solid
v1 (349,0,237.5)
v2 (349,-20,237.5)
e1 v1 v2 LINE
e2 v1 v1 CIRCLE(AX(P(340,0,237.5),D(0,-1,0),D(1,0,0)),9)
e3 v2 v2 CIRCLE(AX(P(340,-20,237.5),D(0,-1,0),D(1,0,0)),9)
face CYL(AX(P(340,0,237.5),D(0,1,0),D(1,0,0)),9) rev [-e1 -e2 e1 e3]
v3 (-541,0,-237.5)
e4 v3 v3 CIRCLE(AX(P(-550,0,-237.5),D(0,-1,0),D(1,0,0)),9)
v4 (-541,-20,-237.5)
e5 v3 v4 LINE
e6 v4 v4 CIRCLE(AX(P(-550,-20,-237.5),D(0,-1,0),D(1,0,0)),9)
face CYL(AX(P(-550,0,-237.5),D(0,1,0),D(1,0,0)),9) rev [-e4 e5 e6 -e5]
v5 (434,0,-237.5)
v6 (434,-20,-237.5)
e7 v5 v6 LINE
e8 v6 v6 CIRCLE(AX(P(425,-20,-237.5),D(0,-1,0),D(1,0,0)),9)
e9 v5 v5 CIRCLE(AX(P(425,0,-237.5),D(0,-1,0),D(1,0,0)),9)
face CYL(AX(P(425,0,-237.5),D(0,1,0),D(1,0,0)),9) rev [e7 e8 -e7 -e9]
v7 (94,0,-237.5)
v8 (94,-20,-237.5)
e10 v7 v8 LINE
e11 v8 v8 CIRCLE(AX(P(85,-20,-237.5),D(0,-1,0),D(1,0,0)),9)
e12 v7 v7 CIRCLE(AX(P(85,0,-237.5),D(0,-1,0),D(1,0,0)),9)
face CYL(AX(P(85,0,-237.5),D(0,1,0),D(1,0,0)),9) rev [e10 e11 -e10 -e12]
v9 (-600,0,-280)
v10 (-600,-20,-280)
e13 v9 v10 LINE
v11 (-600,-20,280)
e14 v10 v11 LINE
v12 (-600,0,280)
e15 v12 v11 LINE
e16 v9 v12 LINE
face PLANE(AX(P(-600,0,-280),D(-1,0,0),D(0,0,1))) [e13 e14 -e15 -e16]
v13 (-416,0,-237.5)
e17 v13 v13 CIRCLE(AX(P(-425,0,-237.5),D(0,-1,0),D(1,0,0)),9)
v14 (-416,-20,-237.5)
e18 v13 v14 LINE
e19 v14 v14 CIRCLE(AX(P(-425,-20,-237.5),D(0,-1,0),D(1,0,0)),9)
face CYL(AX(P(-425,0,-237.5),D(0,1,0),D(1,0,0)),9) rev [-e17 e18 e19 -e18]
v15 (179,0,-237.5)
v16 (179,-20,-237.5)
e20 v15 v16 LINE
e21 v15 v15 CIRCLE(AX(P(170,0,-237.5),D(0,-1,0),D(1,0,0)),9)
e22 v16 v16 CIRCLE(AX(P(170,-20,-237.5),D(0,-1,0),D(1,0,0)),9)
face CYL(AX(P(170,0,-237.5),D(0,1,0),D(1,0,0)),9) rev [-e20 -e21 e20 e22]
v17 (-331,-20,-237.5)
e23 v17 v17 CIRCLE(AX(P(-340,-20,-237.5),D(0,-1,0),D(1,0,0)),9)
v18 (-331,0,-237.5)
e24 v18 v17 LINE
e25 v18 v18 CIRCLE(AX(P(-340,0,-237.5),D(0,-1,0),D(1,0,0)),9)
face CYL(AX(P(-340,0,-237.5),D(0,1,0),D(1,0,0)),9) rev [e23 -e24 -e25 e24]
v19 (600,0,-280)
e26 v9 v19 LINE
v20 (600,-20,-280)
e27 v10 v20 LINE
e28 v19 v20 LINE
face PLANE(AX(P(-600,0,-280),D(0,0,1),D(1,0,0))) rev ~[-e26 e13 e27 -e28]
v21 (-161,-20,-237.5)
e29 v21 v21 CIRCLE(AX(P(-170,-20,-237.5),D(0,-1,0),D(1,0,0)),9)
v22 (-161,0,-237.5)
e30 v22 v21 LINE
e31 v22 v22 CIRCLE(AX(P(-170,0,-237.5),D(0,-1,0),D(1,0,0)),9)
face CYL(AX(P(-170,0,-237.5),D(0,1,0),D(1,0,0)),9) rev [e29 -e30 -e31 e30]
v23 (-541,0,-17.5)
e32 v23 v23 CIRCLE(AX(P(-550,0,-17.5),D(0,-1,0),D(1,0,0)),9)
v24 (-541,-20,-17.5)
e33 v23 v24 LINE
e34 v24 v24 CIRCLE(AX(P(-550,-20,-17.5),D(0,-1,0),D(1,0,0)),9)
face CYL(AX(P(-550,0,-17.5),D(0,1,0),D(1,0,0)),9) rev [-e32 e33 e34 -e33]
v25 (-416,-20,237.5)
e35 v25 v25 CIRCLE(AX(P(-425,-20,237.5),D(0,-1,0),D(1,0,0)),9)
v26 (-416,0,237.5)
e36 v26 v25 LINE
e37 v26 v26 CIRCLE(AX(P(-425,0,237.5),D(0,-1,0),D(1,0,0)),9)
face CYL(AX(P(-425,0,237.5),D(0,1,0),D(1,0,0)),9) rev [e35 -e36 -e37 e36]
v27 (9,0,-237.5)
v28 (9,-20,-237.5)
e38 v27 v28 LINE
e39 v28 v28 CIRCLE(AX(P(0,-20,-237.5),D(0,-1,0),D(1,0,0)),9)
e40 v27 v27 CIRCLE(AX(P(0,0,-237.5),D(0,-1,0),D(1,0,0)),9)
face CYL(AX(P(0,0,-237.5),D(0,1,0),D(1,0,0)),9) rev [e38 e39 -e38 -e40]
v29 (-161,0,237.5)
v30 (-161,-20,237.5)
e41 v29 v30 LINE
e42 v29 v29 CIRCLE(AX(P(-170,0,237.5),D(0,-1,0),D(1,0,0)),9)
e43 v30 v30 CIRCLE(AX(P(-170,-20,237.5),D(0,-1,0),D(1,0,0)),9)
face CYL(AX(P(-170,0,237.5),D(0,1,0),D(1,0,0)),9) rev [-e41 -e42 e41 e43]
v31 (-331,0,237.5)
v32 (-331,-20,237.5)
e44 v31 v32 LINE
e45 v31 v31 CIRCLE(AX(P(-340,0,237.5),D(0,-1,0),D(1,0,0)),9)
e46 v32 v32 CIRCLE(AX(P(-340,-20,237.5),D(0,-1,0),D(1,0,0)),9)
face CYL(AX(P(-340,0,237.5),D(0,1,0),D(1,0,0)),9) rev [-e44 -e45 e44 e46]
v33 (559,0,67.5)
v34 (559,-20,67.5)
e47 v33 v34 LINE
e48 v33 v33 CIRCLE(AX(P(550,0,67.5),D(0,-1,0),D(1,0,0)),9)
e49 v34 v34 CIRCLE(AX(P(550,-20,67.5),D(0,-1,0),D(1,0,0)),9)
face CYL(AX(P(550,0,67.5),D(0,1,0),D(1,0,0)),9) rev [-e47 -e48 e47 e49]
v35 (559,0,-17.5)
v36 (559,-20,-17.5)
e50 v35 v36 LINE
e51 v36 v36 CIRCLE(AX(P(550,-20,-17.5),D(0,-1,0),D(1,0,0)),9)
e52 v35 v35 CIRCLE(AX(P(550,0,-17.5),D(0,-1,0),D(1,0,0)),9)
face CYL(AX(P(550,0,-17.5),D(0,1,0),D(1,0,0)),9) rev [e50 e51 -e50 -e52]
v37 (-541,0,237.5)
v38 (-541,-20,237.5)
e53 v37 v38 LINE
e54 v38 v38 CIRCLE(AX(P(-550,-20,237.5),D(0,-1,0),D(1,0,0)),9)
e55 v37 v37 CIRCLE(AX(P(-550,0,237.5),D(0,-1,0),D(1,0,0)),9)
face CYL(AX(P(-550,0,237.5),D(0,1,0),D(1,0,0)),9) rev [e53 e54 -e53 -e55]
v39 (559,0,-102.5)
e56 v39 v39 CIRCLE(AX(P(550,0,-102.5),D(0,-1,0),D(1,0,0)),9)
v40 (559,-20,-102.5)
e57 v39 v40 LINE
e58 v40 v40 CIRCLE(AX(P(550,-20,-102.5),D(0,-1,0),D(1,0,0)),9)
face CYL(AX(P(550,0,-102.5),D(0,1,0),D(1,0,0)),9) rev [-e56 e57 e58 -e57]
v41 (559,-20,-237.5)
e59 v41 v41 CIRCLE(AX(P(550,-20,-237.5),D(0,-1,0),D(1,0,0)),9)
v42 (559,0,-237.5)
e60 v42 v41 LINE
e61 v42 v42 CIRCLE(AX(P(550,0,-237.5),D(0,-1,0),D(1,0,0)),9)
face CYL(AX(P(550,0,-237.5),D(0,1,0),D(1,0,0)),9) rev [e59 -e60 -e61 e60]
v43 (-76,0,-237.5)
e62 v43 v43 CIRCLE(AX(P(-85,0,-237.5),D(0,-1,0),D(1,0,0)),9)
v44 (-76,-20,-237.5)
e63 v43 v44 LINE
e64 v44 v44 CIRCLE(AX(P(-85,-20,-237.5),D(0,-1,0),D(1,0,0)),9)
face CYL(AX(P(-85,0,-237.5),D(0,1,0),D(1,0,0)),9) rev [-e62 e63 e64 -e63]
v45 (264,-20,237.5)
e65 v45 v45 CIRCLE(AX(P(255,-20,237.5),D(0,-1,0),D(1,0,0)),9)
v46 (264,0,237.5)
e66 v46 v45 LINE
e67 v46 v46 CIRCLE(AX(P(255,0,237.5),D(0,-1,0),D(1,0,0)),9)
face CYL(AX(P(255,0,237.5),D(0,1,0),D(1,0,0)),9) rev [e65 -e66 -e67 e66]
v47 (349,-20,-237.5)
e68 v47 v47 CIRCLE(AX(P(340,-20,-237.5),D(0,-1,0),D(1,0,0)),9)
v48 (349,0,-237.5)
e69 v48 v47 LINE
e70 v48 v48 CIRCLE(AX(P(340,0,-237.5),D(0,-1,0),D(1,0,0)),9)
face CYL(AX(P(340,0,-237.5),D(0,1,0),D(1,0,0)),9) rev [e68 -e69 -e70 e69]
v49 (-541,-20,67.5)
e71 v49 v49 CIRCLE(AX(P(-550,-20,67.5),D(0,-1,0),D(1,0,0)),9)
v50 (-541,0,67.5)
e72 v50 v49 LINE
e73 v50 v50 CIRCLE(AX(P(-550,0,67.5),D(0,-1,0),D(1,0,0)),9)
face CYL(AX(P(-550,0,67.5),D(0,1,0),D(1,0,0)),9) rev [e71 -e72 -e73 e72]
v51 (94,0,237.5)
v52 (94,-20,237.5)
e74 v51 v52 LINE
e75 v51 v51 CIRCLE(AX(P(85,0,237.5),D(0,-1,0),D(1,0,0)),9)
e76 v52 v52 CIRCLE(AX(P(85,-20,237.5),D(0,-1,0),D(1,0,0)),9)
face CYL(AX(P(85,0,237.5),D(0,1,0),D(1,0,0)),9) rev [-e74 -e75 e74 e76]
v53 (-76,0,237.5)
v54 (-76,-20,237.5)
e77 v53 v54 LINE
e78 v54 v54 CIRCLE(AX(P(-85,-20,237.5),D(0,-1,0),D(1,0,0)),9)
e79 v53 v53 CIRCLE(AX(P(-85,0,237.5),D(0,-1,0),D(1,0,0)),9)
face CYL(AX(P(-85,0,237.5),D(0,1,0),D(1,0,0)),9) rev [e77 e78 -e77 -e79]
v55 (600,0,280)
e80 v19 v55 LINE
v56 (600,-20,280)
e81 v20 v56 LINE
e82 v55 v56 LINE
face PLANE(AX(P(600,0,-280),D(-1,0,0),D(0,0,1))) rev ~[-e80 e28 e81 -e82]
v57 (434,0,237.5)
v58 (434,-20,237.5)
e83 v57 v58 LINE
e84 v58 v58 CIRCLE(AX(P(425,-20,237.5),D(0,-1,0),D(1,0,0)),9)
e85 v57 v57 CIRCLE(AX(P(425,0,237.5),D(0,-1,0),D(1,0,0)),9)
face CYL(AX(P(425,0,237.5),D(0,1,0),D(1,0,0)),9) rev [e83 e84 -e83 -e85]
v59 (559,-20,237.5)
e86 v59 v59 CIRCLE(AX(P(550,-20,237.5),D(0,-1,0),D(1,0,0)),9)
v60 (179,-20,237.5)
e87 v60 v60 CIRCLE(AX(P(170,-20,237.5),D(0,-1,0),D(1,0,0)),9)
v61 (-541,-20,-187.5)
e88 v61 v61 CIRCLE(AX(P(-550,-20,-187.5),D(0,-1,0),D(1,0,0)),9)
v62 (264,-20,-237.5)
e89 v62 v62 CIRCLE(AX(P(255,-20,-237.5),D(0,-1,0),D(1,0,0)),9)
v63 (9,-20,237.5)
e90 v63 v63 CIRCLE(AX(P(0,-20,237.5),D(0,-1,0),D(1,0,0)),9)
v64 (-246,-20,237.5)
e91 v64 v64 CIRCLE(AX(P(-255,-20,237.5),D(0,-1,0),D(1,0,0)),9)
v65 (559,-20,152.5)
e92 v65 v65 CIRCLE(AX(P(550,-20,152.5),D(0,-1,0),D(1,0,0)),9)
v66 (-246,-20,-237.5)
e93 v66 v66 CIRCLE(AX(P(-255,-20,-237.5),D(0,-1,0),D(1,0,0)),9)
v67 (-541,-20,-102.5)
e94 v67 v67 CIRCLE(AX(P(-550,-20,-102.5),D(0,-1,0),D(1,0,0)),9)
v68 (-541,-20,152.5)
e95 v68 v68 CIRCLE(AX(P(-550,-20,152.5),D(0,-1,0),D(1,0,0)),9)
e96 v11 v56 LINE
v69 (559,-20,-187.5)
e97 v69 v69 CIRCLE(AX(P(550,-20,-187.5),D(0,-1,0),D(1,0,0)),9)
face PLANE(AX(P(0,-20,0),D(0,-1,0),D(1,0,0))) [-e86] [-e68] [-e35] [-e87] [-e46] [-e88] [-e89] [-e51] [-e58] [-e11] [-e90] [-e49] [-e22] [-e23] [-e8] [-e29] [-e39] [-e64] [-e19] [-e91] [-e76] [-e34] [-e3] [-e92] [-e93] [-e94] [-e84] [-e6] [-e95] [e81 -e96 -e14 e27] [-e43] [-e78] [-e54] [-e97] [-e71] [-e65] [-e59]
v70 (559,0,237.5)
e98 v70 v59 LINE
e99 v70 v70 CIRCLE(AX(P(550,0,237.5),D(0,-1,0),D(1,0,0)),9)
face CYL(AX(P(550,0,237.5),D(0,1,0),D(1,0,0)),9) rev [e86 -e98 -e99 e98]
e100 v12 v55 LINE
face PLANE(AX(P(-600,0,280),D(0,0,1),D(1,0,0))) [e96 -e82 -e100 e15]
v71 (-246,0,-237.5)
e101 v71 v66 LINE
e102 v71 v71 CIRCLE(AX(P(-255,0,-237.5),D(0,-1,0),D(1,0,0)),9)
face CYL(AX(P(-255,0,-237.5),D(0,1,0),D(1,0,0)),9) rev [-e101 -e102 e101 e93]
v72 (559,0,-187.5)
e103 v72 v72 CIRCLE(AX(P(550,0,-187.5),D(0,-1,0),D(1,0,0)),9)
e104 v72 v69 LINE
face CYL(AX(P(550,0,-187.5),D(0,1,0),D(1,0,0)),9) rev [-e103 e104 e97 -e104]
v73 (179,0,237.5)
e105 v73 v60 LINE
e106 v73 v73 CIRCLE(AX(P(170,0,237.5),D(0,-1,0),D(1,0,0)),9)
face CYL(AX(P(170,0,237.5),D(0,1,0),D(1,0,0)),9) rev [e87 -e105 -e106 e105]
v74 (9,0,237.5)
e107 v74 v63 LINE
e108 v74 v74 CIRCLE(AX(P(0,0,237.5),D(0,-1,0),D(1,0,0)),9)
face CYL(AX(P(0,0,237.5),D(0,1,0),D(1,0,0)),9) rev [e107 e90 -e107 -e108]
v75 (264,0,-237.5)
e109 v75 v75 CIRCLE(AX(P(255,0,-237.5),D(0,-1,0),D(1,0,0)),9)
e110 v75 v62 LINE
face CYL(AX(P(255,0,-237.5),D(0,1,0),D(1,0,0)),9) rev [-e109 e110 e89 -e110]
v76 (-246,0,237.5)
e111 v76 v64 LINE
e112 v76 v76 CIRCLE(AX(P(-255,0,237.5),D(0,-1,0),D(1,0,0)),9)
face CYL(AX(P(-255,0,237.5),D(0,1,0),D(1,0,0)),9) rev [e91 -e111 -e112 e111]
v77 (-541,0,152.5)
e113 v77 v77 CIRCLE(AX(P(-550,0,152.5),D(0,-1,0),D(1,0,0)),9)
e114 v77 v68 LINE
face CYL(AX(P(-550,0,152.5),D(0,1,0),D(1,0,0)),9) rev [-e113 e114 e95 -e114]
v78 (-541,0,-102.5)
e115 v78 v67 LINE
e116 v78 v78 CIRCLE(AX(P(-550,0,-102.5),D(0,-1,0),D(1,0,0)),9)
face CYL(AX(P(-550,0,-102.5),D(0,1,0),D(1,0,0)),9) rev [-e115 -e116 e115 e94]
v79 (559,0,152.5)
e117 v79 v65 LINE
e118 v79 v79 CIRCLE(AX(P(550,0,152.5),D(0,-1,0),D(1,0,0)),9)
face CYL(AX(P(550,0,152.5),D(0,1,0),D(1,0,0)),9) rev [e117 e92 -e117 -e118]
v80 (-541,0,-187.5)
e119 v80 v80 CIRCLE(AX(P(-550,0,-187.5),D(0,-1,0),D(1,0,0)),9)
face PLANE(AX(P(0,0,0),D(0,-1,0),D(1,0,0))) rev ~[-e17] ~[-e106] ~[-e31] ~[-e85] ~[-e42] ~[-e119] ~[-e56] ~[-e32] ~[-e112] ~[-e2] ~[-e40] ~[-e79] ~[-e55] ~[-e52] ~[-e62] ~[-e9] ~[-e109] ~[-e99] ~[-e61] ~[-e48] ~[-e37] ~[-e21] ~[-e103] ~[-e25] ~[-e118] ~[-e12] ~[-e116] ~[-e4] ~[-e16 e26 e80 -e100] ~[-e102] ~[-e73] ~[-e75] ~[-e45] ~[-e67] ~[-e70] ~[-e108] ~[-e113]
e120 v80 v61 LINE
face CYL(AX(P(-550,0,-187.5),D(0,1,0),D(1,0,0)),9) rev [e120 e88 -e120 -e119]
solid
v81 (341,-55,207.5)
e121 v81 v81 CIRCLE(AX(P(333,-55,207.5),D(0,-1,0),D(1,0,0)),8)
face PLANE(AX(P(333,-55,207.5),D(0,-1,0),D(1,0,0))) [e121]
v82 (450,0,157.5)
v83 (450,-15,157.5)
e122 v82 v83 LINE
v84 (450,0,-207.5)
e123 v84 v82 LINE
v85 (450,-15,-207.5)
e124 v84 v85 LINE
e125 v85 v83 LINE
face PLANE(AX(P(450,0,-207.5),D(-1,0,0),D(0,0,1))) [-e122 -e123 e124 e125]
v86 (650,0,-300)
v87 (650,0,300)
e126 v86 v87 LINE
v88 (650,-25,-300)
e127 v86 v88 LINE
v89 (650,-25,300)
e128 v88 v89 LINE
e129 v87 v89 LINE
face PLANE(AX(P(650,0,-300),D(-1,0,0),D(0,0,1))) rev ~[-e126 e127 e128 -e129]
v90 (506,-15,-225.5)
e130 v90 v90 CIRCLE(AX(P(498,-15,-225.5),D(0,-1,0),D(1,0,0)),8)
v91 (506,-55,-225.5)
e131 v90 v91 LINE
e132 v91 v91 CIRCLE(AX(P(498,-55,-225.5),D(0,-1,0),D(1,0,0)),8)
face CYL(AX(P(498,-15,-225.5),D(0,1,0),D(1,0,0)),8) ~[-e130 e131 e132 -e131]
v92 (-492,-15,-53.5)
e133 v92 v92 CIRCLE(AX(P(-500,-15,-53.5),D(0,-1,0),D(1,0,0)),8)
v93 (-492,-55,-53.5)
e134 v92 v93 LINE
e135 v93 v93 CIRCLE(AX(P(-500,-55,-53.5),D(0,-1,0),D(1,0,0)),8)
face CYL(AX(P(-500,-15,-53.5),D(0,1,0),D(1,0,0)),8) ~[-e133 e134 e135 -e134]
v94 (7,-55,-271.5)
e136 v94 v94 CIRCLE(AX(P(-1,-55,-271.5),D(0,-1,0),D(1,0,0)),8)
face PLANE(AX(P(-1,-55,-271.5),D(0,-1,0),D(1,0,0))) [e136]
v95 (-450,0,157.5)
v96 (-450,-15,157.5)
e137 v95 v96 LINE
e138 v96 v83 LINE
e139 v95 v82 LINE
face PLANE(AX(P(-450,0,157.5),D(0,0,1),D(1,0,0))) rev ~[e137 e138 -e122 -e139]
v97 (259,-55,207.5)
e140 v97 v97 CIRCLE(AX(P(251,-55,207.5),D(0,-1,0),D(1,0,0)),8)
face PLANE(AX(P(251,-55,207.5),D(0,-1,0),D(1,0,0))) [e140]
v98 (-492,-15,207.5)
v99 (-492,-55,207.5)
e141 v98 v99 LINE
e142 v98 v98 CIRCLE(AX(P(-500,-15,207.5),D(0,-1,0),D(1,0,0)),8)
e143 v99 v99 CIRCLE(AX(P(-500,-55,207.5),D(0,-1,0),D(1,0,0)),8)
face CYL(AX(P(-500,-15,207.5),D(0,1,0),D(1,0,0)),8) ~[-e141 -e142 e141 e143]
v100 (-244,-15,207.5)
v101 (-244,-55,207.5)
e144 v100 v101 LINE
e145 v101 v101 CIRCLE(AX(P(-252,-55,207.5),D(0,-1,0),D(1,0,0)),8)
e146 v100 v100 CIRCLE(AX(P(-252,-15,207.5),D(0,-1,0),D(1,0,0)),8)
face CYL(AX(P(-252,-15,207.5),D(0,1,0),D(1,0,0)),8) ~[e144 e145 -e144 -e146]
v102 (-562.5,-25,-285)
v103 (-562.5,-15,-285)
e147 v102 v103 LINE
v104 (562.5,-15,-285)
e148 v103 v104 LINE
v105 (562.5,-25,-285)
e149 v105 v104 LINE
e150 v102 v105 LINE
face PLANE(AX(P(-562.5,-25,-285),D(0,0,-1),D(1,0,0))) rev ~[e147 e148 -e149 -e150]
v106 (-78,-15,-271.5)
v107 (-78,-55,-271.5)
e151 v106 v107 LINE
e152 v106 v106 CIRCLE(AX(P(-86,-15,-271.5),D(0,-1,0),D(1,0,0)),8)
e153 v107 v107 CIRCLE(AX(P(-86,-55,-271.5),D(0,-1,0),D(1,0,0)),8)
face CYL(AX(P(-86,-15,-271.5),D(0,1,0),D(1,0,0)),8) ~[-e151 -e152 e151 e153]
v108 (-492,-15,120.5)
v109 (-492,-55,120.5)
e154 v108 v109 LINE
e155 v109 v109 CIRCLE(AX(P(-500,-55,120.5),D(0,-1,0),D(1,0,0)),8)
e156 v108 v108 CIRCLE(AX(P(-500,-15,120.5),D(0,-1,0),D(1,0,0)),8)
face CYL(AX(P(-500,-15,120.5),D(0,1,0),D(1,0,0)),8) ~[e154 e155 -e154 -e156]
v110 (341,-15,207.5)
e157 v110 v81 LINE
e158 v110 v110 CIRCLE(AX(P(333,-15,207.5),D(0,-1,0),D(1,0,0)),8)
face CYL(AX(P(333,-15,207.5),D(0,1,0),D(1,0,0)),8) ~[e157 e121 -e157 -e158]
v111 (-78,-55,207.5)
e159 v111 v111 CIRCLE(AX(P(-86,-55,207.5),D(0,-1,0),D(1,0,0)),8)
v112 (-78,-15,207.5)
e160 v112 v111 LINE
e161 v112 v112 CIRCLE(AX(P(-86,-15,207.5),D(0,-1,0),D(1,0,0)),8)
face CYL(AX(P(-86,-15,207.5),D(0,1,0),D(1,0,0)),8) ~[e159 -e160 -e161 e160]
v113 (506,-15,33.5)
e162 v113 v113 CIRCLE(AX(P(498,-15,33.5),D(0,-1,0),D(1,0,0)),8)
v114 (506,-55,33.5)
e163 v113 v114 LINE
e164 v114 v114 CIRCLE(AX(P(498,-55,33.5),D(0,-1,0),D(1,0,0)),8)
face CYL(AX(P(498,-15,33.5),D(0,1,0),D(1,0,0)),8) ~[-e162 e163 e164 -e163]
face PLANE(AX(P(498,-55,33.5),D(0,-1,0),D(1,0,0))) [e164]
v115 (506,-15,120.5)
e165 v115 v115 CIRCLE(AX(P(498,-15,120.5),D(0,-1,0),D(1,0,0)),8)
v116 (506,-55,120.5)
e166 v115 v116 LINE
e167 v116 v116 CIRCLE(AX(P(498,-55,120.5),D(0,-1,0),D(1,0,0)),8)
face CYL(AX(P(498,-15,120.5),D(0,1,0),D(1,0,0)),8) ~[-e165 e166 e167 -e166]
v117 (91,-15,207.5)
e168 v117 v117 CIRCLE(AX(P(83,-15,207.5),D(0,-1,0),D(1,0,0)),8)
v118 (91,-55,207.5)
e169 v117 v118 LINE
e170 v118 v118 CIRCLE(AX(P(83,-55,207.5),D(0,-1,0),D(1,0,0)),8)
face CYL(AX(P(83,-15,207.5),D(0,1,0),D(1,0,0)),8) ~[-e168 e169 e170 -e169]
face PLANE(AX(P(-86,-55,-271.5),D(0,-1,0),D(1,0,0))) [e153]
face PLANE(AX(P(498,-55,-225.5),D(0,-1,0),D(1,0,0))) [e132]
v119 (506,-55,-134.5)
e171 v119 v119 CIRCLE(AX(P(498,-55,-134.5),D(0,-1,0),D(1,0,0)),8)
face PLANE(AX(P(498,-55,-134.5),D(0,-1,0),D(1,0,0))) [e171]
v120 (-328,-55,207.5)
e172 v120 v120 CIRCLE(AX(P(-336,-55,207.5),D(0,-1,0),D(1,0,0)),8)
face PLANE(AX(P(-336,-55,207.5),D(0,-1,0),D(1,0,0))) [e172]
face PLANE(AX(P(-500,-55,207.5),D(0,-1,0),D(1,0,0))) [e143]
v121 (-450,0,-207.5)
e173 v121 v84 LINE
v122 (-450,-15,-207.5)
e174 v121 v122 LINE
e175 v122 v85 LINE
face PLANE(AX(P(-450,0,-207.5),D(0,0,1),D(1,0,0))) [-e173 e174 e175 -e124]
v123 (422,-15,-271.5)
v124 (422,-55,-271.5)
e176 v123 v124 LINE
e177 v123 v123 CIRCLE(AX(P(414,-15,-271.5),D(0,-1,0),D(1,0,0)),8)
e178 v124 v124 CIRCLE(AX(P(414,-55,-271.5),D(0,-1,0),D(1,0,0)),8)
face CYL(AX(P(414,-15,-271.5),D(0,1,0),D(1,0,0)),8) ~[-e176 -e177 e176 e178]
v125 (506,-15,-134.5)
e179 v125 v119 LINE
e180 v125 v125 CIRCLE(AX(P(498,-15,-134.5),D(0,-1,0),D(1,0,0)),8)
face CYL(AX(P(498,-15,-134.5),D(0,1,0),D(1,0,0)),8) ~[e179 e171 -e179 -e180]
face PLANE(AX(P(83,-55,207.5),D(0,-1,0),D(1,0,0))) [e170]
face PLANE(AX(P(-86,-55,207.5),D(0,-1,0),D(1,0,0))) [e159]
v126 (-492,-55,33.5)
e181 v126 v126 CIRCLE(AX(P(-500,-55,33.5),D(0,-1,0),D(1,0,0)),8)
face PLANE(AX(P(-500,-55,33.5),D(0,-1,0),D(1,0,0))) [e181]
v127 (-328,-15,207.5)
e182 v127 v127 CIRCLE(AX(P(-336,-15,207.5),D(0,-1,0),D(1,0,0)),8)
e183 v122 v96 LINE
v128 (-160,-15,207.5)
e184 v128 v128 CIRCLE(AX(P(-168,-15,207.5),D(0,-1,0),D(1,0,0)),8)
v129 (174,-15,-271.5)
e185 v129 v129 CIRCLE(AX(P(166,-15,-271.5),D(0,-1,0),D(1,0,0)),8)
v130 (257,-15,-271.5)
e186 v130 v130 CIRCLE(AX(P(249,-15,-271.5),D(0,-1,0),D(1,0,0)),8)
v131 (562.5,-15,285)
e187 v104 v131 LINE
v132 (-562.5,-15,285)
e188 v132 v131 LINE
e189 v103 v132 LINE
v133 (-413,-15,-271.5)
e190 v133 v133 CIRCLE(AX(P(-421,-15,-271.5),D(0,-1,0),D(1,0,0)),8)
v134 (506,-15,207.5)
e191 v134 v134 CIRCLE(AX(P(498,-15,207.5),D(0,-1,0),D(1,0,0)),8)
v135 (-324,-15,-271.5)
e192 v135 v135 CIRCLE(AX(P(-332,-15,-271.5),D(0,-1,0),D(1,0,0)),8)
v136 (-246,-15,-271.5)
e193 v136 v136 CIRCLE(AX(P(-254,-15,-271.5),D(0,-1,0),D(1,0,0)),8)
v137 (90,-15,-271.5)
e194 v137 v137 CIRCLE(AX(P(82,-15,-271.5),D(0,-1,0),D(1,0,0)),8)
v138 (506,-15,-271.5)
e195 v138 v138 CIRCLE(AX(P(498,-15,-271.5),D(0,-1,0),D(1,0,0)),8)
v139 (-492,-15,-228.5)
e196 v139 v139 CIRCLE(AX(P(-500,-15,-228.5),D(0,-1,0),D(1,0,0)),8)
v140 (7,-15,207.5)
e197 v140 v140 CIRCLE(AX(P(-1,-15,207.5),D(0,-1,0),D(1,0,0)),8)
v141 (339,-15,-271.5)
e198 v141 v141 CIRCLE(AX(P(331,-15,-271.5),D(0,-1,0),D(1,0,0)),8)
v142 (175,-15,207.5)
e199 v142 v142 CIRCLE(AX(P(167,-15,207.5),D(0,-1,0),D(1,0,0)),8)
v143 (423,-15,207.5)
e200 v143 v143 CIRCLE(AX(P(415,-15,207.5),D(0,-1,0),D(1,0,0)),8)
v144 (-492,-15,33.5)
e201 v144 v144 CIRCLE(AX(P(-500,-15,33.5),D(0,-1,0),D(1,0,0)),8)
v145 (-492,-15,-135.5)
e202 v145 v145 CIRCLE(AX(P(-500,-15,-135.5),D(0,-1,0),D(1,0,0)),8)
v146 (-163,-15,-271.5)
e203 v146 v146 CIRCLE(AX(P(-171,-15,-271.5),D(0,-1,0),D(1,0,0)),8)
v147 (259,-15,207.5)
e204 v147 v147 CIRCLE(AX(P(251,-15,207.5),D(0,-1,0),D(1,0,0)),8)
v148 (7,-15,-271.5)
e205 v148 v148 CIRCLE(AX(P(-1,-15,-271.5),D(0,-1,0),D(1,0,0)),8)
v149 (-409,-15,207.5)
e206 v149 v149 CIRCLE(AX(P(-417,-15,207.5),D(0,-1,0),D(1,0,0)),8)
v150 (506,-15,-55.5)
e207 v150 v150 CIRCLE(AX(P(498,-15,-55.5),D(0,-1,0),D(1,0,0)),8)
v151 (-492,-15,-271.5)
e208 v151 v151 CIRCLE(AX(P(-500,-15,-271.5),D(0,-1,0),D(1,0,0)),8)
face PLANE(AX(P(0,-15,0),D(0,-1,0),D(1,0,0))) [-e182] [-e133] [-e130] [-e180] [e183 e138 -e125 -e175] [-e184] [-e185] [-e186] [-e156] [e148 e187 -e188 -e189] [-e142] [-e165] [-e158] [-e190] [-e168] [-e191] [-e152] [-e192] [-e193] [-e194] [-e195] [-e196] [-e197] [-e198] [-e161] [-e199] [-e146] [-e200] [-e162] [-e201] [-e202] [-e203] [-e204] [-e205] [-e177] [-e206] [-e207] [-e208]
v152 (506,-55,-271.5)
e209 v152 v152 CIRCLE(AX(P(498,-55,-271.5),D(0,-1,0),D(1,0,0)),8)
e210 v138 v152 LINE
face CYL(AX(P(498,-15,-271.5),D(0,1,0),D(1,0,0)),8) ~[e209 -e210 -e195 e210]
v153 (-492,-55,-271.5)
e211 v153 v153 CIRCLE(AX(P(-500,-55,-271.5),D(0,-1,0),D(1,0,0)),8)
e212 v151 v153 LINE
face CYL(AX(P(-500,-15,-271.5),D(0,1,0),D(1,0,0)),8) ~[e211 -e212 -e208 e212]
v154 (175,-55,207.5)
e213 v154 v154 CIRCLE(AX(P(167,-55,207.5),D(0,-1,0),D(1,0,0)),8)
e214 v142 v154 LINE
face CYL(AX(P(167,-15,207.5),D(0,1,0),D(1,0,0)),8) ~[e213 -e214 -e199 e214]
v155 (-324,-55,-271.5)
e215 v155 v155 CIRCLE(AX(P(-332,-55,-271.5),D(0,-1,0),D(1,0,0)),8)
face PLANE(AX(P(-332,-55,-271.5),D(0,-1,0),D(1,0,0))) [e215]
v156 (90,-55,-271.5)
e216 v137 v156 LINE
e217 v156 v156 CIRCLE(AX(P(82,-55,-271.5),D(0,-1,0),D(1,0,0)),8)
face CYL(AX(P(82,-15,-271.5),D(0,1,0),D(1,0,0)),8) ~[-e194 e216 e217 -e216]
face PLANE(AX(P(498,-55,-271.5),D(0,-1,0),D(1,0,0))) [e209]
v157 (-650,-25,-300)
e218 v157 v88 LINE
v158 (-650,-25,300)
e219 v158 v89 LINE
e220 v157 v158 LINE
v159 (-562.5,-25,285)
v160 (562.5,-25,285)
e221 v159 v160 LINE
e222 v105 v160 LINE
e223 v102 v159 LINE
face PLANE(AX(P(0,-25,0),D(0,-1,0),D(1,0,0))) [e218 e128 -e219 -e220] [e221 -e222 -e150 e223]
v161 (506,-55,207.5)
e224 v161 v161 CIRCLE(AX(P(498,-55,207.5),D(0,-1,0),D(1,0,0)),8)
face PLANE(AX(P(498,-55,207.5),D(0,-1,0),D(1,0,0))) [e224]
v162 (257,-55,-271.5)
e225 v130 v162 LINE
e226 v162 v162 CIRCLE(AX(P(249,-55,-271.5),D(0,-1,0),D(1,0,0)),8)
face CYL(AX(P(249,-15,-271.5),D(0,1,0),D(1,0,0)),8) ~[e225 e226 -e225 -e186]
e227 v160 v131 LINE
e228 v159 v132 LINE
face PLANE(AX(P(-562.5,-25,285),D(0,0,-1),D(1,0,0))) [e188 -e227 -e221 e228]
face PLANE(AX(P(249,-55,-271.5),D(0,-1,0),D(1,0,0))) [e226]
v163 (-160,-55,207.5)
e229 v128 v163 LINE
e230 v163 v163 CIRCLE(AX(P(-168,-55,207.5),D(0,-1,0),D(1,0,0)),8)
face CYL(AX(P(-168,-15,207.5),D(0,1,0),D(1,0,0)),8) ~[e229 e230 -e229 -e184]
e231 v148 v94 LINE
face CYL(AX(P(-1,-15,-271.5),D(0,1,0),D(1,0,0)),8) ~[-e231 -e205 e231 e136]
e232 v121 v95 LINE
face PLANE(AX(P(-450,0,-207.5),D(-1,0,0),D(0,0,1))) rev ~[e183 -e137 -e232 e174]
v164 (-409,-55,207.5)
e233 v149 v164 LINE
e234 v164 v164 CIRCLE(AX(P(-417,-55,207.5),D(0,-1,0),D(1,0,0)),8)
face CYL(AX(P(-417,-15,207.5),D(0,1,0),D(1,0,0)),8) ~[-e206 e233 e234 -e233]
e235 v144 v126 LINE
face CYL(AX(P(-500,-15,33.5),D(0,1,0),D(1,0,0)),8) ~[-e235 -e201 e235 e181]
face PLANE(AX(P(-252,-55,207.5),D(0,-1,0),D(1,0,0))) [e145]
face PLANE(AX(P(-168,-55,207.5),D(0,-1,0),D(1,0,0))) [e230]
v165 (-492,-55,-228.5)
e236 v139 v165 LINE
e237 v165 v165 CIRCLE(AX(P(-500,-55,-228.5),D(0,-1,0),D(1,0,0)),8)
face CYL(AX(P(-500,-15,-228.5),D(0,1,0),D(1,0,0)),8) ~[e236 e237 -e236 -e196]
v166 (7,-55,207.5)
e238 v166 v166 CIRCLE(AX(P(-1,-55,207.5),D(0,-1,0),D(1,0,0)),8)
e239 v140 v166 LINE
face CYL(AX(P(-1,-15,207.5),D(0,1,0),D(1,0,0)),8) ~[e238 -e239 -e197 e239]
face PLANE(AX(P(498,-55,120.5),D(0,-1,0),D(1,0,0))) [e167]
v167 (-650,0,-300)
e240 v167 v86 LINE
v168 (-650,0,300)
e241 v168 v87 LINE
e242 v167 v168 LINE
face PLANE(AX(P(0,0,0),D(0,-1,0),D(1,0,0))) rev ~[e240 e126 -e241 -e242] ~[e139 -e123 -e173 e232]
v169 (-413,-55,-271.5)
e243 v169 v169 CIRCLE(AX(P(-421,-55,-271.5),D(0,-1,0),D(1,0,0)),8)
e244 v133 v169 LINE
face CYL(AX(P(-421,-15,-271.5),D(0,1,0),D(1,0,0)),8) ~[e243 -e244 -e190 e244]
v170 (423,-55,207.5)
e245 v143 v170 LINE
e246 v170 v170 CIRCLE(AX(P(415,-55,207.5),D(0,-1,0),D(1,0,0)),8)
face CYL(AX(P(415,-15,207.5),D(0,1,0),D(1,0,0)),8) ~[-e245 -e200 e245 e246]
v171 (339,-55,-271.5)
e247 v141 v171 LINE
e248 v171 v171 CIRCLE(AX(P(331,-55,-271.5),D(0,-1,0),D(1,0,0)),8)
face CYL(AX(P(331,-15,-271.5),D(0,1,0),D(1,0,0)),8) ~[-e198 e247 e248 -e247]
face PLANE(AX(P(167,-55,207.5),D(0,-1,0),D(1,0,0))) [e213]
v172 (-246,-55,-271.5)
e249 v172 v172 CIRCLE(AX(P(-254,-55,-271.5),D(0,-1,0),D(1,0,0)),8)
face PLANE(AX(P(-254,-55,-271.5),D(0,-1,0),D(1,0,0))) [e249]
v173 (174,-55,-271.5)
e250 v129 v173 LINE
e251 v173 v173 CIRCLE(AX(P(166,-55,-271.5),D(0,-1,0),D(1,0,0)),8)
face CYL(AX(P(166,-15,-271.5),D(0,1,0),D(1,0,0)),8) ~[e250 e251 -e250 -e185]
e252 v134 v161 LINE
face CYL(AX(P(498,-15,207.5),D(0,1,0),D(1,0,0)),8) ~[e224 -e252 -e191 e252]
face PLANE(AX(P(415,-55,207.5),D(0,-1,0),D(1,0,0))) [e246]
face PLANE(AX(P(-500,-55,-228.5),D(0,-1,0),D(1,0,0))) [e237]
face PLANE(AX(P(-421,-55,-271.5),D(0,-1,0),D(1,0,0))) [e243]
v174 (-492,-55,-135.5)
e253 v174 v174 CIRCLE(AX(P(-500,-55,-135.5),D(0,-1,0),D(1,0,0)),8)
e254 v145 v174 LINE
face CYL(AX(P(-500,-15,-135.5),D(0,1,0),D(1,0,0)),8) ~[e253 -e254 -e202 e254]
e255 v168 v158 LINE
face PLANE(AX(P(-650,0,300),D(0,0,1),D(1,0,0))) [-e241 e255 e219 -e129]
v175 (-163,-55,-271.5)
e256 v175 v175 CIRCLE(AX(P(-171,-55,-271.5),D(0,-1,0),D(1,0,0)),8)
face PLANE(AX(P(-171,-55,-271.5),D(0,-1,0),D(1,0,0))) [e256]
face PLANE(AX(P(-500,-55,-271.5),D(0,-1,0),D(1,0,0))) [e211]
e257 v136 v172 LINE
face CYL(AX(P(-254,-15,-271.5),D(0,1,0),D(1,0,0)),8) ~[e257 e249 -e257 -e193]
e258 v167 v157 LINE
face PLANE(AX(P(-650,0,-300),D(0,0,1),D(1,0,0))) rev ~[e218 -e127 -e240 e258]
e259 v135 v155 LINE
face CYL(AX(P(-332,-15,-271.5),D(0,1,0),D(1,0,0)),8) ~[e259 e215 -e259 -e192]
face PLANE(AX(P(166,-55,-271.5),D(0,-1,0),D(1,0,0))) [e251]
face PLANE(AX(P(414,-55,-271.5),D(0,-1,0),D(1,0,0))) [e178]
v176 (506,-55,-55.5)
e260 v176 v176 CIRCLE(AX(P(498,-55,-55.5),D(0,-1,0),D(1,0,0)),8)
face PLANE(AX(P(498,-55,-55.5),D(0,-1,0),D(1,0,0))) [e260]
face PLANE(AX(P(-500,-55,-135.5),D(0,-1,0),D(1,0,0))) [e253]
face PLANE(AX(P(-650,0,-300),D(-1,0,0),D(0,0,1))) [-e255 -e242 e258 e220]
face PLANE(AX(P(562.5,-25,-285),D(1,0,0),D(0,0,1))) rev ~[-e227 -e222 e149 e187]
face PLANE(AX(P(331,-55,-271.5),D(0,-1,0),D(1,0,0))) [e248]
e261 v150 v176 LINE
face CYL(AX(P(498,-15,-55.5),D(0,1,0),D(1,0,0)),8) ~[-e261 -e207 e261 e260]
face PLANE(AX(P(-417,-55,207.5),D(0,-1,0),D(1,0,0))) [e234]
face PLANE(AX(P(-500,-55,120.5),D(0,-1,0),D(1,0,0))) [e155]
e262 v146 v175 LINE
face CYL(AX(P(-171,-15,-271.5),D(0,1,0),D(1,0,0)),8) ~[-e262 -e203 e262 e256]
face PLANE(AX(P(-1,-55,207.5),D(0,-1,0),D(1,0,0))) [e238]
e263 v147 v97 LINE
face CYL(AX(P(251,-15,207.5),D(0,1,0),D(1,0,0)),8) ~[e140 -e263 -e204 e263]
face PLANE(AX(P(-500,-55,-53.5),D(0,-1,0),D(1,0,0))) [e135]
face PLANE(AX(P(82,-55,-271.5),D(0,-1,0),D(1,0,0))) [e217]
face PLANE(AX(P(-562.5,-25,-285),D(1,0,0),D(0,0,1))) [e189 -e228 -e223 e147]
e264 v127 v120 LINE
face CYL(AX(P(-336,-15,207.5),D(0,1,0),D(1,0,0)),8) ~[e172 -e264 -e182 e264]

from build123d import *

# Parameters (mm, degrees)
F0_W     = 1200
F0_H     = 560
F0_R     = 9
F1_DEPTH = 20
F2_W     = 1300
F2_H     = 600
F2_W_2   = 900
F2_H_2   = 365
F3_DEPTH = 25
F4_W     = 1125
F4_H     = 570
F4_W_2   = 900
F4_H_2   = 365
F5_DEPTH = 10
F6_R     = 8
F7_DEPTH = 40


with BuildPart() as f1:
    # F0 (on Front) → F1 (new body)
    with BuildSketch(Plane.XZ):
        Rectangle(F0_W, F0_H)
        with Locations((-550, -237.5)):
            Circle(F0_R, mode=Mode.SUBTRACT)
        with Locations((-425, -237.5)):
            Circle(F0_R, mode=Mode.SUBTRACT)
        with Locations((-340, -237.5)):
            Circle(F0_R, mode=Mode.SUBTRACT)
        with Locations((-550, -187.5)):
            Circle(F0_R, mode=Mode.SUBTRACT)
        with Locations((-255, -237.5)):
            Circle(F0_R, mode=Mode.SUBTRACT)
        with Locations((-170, -237.5)):
            Circle(F0_R, mode=Mode.SUBTRACT)
        with Locations((-85, -237.5)):
            Circle(F0_R, mode=Mode.SUBTRACT)
        with Locations((-550, -102.5)):
            Circle(F0_R, mode=Mode.SUBTRACT)
        with Locations((-550, -17.5)):
            Circle(F0_R, mode=Mode.SUBTRACT)
        with Locations((0, -237.5)):
            Circle(F0_R, mode=Mode.SUBTRACT)
        with Locations((85, -237.5)):
            Circle(F0_R, mode=Mode.SUBTRACT)
        with Locations((170, -237.5)):
            Circle(F0_R, mode=Mode.SUBTRACT)
        with Locations((255, -237.5)):
            Circle(F0_R, mode=Mode.SUBTRACT)
        with Locations((340, -237.5)):
            Circle(F0_R, mode=Mode.SUBTRACT)
        with Locations((425, -237.5)):
            Circle(F0_R, mode=Mode.SUBTRACT)
        with Locations((550, -237.5)):
            Circle(F0_R, mode=Mode.SUBTRACT)
        with Locations((550, -187.5)):
            Circle(F0_R, mode=Mode.SUBTRACT)
        with Locations((550, -102.5)):
            Circle(F0_R, mode=Mode.SUBTRACT)
        with Locations((550, -17.5)):
            Circle(F0_R, mode=Mode.SUBTRACT)
        with Locations((-550, 67.5)):
            Circle(F0_R, mode=Mode.SUBTRACT)
        with Locations((-550, 152.5)):
            Circle(F0_R, mode=Mode.SUBTRACT)
        with Locations((-550, 237.5)):
            Circle(F0_R, mode=Mode.SUBTRACT)
        with Locations((-425, 237.5)):
            Circle(F0_R, mode=Mode.SUBTRACT)
        with Locations((-340, 237.5)):
            Circle(F0_R, mode=Mode.SUBTRACT)
        with Locations((-255, 237.5)):
            Circle(F0_R, mode=Mode.SUBTRACT)
        with Locations((-170, 237.5)):
            Circle(F0_R, mode=Mode.SUBTRACT)
        with Locations((-85, 237.5)):
            Circle(F0_R, mode=Mode.SUBTRACT)
        with Locations((550, 67.5)):
            Circle(F0_R, mode=Mode.SUBTRACT)
        with Locations((0, 237.5)):
            Circle(F0_R, mode=Mode.SUBTRACT)
        with Locations((85, 237.5)):
            Circle(F0_R, mode=Mode.SUBTRACT)
        with Locations((170, 237.5)):
            Circle(F0_R, mode=Mode.SUBTRACT)
        with Locations((255, 237.5)):
            Circle(F0_R, mode=Mode.SUBTRACT)
        with Locations((550, 152.5)):
            Circle(F0_R, mode=Mode.SUBTRACT)
        with Locations((340, 237.5)):
            Circle(F0_R, mode=Mode.SUBTRACT)
        with Locations((425, 237.5)):
            Circle(F0_R, mode=Mode.SUBTRACT)
        with Locations((550, 237.5)):
            Circle(F0_R, mode=Mode.SUBTRACT)
    extrude(amount=F1_DEPTH)


with BuildPart() as f3:
    # F2 (on Front) → F3 (new body)
    with BuildSketch(Plane.XZ):
        Rectangle(F2_W, F2_H)
        with Locations((0, -25)):
            Rectangle(F2_W_2, F2_H_2, mode=Mode.SUBTRACT)
    extrude(amount=F3_DEPTH)

    # F4 (on face) → F5 (cut)
    with BuildSketch(Plane.XZ.offset(25)):
        Rectangle(F4_W, F4_H)
        with Locations((0, -25)):
            Rectangle(F4_W_2, F4_H_2, mode=Mode.SUBTRACT)
    extrude(amount=-F5_DEPTH, mode=Mode.SUBTRACT)

    # F6 (on face) → F7 (join)
    with BuildSketch(Plane.XZ.offset(15)):
        with Locations((-500, 207.5)):
            Circle(F6_R)
        with Locations((-500, 120.5)):
            Circle(F6_R)
        with Locations((-500, 33.5)):
            Circle(F6_R)
        with Locations((-500, -53.5)):
            Circle(F6_R)
        with Locations((-500, -135.5)):
            Circle(F6_R)
        with Locations((-500, -228.5)):
            Circle(F6_R)
        with Locations((-500, -271.5)):
            Circle(F6_R)
        with Locations((-421, -271.5)):
            Circle(F6_R)
        with Locations((-332, -271.5)):
            Circle(F6_R)
        with Locations((-254, -271.5)):
            Circle(F6_R)
        with Locations((-171, -271.5)):
            Circle(F6_R)
        with Locations((-86, -271.5)):
            Circle(F6_R)
        with Locations((-1, -271.5)):
            Circle(F6_R)
        with Locations((82, -271.5)):
            Circle(F6_R)
        with Locations((166, -271.5)):
            Circle(F6_R)
        with Locations((249, -271.5)):
            Circle(F6_R)
        with Locations((414, -271.5)):
            Circle(F6_R)
        with Locations((498, -271.5)):
            Circle(F6_R)
        with Locations((331, -271.5)):
            Circle(F6_R)
        with Locations((498, -225.5)):
            Circle(F6_R)
        with Locations((498, -134.5)):
            Circle(F6_R)
        with Locations((498, -55.5)):
            Circle(F6_R)
        with Locations((498, 33.5)):
            Circle(F6_R)
        with Locations((498, 120.5)):
            Circle(F6_R)
        with Locations((498, 207.5)):
            Circle(F6_R)
        with Locations((415, 207.5)):
            Circle(F6_R)
        with Locations((333, 207.5)):
            Circle(F6_R)
        with Locations((251, 207.5)):
            Circle(F6_R)
        with Locations((167, 207.5)):
            Circle(F6_R)
        with Locations((83, 207.5)):
            Circle(F6_R)
        with Locations((-1, 207.5)):
            Circle(F6_R)
        with Locations((-86, 207.5)):
            Circle(F6_R)
        with Locations((-168, 207.5)):
            Circle(F6_R)
        with Locations((-252, 207.5)):
            Circle(F6_R)
        with Locations((-336, 207.5)):
            Circle(F6_R)
        with Locations((-417, 207.5)):
            Circle(F6_R)
    extrude(amount=F7_DEPTH)


solid = Compound([f1.part, f3.part])
